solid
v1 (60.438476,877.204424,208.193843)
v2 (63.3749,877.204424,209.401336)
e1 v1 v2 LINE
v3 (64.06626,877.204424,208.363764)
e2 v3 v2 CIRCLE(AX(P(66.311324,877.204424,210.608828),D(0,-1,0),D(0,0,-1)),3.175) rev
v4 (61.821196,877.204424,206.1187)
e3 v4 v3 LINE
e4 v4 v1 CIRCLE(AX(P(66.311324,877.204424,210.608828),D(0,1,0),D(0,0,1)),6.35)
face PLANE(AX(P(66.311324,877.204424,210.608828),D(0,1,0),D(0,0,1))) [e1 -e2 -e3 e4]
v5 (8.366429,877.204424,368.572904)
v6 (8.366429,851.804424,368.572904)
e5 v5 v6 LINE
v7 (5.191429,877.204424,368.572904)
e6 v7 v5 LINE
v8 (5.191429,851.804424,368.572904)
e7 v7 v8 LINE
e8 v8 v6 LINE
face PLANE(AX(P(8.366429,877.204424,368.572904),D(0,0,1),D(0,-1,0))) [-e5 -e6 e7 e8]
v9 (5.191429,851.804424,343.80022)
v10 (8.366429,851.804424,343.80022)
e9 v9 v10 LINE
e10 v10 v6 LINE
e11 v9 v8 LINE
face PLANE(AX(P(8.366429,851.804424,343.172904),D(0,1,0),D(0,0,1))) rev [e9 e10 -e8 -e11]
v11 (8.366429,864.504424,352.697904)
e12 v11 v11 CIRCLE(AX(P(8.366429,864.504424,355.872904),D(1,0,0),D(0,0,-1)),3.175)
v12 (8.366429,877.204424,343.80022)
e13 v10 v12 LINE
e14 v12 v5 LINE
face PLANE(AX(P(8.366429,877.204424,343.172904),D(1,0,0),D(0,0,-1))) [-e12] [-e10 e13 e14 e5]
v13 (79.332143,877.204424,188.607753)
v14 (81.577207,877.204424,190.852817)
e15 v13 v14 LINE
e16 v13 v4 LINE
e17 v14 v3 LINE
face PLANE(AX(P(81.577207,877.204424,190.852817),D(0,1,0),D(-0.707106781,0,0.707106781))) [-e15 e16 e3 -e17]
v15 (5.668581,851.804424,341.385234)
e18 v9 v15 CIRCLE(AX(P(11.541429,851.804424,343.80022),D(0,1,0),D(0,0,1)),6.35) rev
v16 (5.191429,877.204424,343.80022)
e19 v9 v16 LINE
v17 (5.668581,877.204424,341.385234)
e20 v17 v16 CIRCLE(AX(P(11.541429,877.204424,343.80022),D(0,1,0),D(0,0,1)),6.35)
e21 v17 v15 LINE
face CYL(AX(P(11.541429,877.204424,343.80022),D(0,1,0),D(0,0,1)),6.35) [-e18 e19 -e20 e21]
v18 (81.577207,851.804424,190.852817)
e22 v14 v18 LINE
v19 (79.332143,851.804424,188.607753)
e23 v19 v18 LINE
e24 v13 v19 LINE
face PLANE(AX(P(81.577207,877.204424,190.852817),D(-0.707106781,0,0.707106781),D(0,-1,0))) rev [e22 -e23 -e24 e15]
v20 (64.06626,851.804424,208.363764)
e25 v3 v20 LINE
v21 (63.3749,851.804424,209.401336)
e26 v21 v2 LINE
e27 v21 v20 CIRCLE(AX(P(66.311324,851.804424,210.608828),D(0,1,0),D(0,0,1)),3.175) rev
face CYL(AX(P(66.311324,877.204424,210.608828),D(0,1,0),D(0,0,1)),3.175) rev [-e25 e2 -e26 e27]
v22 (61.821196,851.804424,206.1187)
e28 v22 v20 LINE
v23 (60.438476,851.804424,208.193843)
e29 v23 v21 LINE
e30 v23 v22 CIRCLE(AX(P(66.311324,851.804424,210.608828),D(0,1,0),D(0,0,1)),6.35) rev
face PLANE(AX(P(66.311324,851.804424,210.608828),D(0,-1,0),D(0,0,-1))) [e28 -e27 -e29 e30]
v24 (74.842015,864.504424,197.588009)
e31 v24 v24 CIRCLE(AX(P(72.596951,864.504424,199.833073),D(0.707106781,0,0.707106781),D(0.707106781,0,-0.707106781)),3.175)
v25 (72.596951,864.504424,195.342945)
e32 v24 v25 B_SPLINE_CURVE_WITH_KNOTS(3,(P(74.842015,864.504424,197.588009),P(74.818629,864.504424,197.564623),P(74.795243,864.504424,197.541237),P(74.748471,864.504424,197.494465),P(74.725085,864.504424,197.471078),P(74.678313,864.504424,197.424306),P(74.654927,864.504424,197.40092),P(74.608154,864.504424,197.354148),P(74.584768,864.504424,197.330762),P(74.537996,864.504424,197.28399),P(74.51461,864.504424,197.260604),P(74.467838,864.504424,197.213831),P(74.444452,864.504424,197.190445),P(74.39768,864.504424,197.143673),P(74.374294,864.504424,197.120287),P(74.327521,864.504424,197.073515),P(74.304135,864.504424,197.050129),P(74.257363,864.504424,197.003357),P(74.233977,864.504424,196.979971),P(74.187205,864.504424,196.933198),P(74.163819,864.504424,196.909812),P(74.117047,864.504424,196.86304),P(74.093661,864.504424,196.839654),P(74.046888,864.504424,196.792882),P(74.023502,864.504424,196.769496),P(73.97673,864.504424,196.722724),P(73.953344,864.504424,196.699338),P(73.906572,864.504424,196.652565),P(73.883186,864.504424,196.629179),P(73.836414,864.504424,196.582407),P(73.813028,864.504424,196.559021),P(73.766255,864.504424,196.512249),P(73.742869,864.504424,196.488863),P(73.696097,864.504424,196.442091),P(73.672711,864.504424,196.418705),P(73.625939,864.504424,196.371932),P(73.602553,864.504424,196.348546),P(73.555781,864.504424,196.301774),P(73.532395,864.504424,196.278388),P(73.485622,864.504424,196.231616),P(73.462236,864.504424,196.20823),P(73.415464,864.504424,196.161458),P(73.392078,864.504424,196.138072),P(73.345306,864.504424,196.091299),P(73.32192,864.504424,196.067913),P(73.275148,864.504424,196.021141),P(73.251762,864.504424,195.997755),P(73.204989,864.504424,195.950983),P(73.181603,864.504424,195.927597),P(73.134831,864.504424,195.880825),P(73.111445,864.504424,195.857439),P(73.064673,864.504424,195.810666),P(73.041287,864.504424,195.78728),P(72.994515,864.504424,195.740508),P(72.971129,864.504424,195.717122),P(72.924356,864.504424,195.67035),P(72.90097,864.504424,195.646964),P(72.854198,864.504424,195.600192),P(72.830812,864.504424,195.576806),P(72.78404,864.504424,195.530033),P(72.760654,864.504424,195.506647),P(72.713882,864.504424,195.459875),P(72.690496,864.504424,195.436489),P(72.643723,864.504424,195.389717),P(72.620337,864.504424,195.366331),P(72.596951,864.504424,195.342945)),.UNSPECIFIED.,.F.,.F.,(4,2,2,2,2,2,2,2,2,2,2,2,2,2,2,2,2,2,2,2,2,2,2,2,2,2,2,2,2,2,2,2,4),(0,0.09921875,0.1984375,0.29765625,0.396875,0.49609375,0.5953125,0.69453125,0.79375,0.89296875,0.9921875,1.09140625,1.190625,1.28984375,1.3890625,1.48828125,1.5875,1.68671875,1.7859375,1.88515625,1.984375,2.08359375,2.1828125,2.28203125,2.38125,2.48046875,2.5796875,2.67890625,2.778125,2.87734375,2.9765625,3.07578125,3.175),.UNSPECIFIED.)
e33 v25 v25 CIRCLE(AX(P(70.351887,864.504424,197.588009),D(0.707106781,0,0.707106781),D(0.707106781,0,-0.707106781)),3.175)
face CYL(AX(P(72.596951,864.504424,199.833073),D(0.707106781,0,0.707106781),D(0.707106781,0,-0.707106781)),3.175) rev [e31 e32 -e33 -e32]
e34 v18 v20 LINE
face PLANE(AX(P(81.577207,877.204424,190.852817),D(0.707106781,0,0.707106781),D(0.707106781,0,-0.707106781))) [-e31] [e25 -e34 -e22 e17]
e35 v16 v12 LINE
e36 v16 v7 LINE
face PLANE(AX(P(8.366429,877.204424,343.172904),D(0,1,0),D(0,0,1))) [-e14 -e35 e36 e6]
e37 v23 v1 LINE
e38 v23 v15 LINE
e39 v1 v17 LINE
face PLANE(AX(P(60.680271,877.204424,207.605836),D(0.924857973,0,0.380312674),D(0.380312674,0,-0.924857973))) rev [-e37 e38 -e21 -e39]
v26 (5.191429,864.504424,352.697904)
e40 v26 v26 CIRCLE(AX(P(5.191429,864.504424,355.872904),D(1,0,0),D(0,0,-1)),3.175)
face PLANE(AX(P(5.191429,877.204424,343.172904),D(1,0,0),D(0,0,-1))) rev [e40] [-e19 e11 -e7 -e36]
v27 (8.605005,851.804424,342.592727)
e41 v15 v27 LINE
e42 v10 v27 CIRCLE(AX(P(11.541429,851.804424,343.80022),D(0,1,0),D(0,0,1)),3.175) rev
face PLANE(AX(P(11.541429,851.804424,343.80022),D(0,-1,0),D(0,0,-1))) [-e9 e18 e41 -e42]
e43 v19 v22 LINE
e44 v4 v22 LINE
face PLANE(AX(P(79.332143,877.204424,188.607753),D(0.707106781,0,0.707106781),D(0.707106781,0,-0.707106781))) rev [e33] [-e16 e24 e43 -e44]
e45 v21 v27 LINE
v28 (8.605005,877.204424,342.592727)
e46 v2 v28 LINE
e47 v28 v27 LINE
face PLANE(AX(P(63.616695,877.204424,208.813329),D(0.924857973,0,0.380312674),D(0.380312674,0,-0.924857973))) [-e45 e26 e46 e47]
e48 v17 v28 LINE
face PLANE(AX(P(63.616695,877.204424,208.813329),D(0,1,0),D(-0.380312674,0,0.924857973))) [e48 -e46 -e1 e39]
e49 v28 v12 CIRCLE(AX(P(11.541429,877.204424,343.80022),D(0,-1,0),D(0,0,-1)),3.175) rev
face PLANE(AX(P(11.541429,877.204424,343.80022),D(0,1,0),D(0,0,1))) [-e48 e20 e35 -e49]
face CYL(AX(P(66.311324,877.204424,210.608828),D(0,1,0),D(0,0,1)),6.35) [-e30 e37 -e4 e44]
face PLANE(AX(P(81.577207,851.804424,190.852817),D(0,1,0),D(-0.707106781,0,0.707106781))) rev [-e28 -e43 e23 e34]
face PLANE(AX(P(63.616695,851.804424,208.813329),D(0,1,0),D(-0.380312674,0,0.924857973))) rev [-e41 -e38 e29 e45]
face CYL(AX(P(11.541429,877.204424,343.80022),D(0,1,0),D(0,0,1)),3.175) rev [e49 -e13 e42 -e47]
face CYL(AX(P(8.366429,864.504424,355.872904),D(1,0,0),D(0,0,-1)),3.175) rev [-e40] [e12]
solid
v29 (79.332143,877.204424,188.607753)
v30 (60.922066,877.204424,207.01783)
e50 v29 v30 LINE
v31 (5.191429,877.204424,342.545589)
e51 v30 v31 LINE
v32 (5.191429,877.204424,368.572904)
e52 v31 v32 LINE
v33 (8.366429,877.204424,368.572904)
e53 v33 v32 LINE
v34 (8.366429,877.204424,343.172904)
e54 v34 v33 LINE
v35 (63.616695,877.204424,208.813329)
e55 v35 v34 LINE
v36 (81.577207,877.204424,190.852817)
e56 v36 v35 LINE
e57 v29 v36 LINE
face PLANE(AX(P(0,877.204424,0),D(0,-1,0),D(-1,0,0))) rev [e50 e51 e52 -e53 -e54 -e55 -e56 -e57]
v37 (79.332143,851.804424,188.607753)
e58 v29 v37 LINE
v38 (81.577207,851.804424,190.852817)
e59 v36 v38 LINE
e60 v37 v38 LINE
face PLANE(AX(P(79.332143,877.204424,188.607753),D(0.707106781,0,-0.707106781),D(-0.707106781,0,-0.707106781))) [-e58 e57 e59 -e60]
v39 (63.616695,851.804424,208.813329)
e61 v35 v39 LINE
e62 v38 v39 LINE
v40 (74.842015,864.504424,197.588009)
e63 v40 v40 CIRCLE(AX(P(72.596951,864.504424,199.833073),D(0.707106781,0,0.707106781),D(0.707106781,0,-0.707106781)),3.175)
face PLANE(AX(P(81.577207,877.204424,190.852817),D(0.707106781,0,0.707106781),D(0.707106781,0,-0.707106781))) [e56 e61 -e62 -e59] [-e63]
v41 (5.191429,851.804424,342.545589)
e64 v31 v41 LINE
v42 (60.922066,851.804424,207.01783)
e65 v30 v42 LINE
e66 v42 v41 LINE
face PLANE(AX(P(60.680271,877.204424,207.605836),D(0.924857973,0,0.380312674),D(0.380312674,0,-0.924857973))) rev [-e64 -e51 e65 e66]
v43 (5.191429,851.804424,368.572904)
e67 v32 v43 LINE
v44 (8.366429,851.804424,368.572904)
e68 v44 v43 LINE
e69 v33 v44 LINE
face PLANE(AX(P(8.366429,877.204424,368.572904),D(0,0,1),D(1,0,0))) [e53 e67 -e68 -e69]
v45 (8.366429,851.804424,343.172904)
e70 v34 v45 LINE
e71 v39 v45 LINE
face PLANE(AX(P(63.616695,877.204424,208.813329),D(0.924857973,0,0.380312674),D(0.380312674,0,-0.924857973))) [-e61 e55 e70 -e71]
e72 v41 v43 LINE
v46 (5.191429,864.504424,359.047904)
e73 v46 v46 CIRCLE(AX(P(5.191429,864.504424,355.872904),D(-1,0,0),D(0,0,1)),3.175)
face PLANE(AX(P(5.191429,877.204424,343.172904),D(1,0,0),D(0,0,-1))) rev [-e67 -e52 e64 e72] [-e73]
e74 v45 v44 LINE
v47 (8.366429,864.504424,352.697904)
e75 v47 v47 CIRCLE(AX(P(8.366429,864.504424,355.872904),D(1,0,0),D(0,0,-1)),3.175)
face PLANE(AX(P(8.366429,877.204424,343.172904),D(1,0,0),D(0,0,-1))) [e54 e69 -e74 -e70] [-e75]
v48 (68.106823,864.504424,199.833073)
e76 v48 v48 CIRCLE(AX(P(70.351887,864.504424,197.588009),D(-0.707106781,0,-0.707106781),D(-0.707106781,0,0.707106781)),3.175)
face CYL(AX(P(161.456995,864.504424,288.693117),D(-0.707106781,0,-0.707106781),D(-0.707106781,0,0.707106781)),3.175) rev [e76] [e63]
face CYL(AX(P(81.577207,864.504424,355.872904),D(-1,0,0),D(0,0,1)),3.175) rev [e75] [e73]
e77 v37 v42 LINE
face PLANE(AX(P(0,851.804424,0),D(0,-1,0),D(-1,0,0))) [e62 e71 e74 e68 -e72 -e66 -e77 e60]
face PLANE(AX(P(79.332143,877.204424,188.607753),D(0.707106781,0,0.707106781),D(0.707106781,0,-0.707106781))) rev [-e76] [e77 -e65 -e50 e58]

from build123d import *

# Parameters (mm, degrees)
EXTRUDE_THIN1_DEPTH    = 12.7
SKETCH3_R              = 3.175
CUT_EXTRUDE1_DEPTH     = 955.551399154
SKETCH2_R              = 3.175
CUT_EXTRUDE2_DEPTH     = 918.120523582
CONVERT_SOLID1_START   = 851.804423502
CONVERT_SOLID1_DEPTH   = 9.5249999
CONVERT_SOLID1_START_2 = 867.679423602
CONVERT_SOLID1_2_DEPTH = 9.5249999
CONVERT_SOLID1_START_3 = 861.329423402
CONVERT_SOLID1_3_DEPTH = 6.3500002


with BuildPart() as part:
    # Sketch1 → Extrude-Thin1 (new, symmetric)
    with BuildSketch(Plane(origin=(0, 864.504423502, 0), x_dir=(1, 0, 0), z_dir=(0, 1, 0))):
        Polygon((81.577207348, -190.852816746), (63.616695106, -208.813328988), (8.366428726, -343.172904376), (8.366428726, -368.572904376), (5.191428726, -368.572904376), (5.191428726, -342.545589137), (60.922066406, -207.017829627), (79.332143317, -188.607752715), align=None)
    extrude(amount=EXTRUDE_THIN1_DEPTH, both=True)

    # Sketch3 → Cut-Extrude1 (cut, through all)
    with BuildSketch(Plane.ZY.offset(-5.191428726)):
        with Locations((355.872904376, 864.504423502)):
            Circle(SKETCH3_R)
    extrude(amount=-CUT_EXTRUDE1_DEPTH, mode=Mode.SUBTRACT)

    # Sketch2 → Cut-Extrude2 (cut, through all)
    with BuildSketch(Plane(origin=(133.969948016, 0, 133.969948016), x_dir=(-0.7071067811865468, 0, 0.7071067811865483), z_dir=(-0.7071067811865483, 0, -0.7071067811865468))):
        with Locations((89.969524424, 864.504423502)):
            Circle(SKETCH2_R)
    extrude(amount=-CUT_EXTRUDE2_DEPTH, mode=Mode.SUBTRACT)


with BuildPart() as body_2:
    # Convert-Solid1: read off the stored shape, not the designer's step
    # Convert-Solid1 outline → Convert-Solid1 (new body)
    with BuildSketch(Plane(origin=(0, 0, 0), x_dir=(1, 0, 0), z_dir=(0, 1, 0)).offset(CONVERT_SOLID1_START)):
        with BuildLine():
            Line((81.577207348, -190.852816746), (79.332143317, -188.607752715))
            Line((79.332143317, -188.607752715), (61.821195745, -206.118700288))
            ThreePointArc((61.821195745, -206.118700288), (61.02697209, -207.087730942), (60.438475677, -208.19384287))
            Line((60.438475677, -208.19384287), (5.668580598, -341.385234136))
            ThreePointArc((5.668580598, -341.385234136), (5.311858692, -342.569383642), (5.191428726, -343.800219615))
            Line((5.191428726, -343.800219615), (5.191428726, -368.572904376))
            Line((5.191428726, -368.572904376), (8.366428726, -368.572904376))
            Line((8.366428726, -368.572904376), (8.366428726, -343.800219615))
            ThreePointArc((8.366428726, -343.800219615), (8.426643709, -343.184801628), (8.605004662, -342.592726875))
            Line((8.605004662, -342.592726875), (63.374899742, -209.401335609))
            ThreePointArc((63.374899742, -209.401335609), (63.669147948, -208.848279645), (64.066259775, -208.363764318))
            Line((64.066259775, -208.363764318), (81.577207348, -190.852816746))
        make_face()
    extrude(amount=CONVERT_SOLID1_DEPTH)

    # Convert-Solid1 2 outline → Convert-Solid1 2 (add)
    with BuildSketch(Plane(origin=(0, 0, 0), x_dir=(1, 0, 0), z_dir=(0, 1, 0)).offset(CONVERT_SOLID1_START_2)):
        with BuildLine():
            Line((81.577207348, -190.852816746), (79.332143317, -188.607752715))
            Line((79.332143317, -188.607752715), (61.821195745, -206.118700288))
            ThreePointArc((61.821195745, -206.118700288), (61.02697209, -207.087730942), (60.438475677, -208.19384287))
            Line((60.438475677, -208.19384287), (5.668580598, -341.385234136))
            ThreePointArc((5.668580598, -341.385234136), (5.311858692, -342.569383642), (5.191428726, -343.800219615))
            Line((5.191428726, -343.800219615), (5.191428726, -368.572904376))
            Line((5.191428726, -368.572904376), (8.366428726, -368.572904376))
            Line((8.366428726, -368.572904376), (8.366428726, -343.800219615))
            ThreePointArc((8.366428726, -343.800219615), (8.426643709, -343.184801628), (8.605004662, -342.592726875))
            Line((8.605004662, -342.592726875), (63.374899742, -209.401335609))
            ThreePointArc((63.374899742, -209.401335609), (63.669147948, -208.848279645), (64.066259775, -208.363764318))
            Line((64.066259775, -208.363764318), (81.577207348, -190.852816746))
        make_face()
    extrude(amount=CONVERT_SOLID1_2_DEPTH)

    # Convert-Solid1 3 outline → Convert-Solid1 3 (add)
    with BuildSketch(Plane(origin=(0, 0, 0), x_dir=(1, 0, 0), z_dir=(0, 1, 0)).offset(CONVERT_SOLID1_START_3)):
        with BuildLine():
            Line((81.577207348, -190.852816746), (79.332143317, -188.607752715))
            Line((79.332143317, -188.607752715), (61.821195745, -206.118700288))
            ThreePointArc((61.821195745, -206.118700288), (61.02697209, -207.087730942), (60.438475677, -208.19384287))
            Line((60.438475677, -208.19384287), (5.668580598, -341.385234136))
            ThreePointArc((5.668580598, -341.385234136), (5.311858692, -342.569383642), (5.191428726, -343.800219615))
            Line((5.191428726, -343.800219615), (5.191428726, -368.572904376))
            Line((5.191428726, -368.572904376), (8.366428726, -368.572904376))
            Line((8.366428726, -368.572904376), (8.366428726, -343.800219615))
            ThreePointArc((8.366428726, -343.800219615), (8.426643709, -343.184801628), (8.605004662, -342.592726875))
            Line((8.605004662, -342.592726875), (63.374899742, -209.401335609))
            ThreePointArc((63.374899742, -209.401335609), (63.669147948, -208.848279645), (64.066259775, -208.363764318))
            Line((64.066259775, -208.363764318), (81.577207348, -190.852816746))
        make_face()
    extrude(amount=CONVERT_SOLID1_3_DEPTH)

    # Convert-Solid1 4: loft between two sections, ruled curve by curve
    convert_solid1_4_from = [
        Edge.make_three_point_arc((72.596951227, 864.504423502, 195.342944806), (70.351887196, 867.679423502, 197.588008837), (68.106823166, 864.504423502, 199.833072867)),
        Edge.make_three_point_arc((68.106823166, 864.504423502, 199.833072867), (70.351887196, 861.329423502, 197.588008837), (72.596951227, 864.504423502, 195.342944806)),
    ]
    convert_solid1_4_to = [
        Edge.make_three_point_arc((74.842015257, 864.504423502, 197.588008837), (72.596951227, 867.679423502, 199.833072867), (70.351887196, 864.504423502, 202.078136897)),
        Edge.make_three_point_arc((70.351887196, 864.504423502, 202.078136897), (72.596951227, 861.329423502, 199.833072867), (74.842015257, 864.504423502, 197.588008837)),
    ]
    convert_solid1_4 = Solid(Shell([*[Face.make_surface_from_curves(convert_solid1_4_from[k], convert_solid1_4_to[k]) for k in range(2)], Face(Wire(convert_solid1_4_from)), Face(Wire(convert_solid1_4_to))]))
    add(convert_solid1_4, mode=Mode.SUBTRACT)

    # Convert-Solid1 5: loft between two sections, ruled curve by curve
    convert_solid1_5_from = [
        Edge.make_three_point_arc((5.191428726, 864.504423502, 352.697904376), (5.191428726, 867.679423502, 355.872904376), (5.191428726, 864.504423502, 359.047904376)),
        Edge.make_three_point_arc((5.191428726, 864.504423502, 359.047904376), (5.191428726, 861.329423502, 355.872904376), (5.191428726, 864.504423502, 352.697904376)),
    ]
    convert_solid1_5_to = [
        Edge.make_three_point_arc((8.366428726, 864.504423502, 352.697904376), (8.366428726, 867.679423502, 355.872904376), (8.366428726, 864.504423502, 359.047904376)),
        Edge.make_three_point_arc((8.366428726, 864.504423502, 359.047904376), (8.366428726, 861.329423502, 355.872904376), (8.366428726, 864.504423502, 352.697904376)),
    ]
    convert_solid1_5 = Solid(Shell([*[Face.make_surface_from_curves(convert_solid1_5_from[k], convert_solid1_5_to[k]) for k in range(2)], Face(Wire(convert_solid1_5_from)), Face(Wire(convert_solid1_5_to))]))
    add(convert_solid1_5, mode=Mode.SUBTRACT)


solid = Compound([part.part, body_2.part])
